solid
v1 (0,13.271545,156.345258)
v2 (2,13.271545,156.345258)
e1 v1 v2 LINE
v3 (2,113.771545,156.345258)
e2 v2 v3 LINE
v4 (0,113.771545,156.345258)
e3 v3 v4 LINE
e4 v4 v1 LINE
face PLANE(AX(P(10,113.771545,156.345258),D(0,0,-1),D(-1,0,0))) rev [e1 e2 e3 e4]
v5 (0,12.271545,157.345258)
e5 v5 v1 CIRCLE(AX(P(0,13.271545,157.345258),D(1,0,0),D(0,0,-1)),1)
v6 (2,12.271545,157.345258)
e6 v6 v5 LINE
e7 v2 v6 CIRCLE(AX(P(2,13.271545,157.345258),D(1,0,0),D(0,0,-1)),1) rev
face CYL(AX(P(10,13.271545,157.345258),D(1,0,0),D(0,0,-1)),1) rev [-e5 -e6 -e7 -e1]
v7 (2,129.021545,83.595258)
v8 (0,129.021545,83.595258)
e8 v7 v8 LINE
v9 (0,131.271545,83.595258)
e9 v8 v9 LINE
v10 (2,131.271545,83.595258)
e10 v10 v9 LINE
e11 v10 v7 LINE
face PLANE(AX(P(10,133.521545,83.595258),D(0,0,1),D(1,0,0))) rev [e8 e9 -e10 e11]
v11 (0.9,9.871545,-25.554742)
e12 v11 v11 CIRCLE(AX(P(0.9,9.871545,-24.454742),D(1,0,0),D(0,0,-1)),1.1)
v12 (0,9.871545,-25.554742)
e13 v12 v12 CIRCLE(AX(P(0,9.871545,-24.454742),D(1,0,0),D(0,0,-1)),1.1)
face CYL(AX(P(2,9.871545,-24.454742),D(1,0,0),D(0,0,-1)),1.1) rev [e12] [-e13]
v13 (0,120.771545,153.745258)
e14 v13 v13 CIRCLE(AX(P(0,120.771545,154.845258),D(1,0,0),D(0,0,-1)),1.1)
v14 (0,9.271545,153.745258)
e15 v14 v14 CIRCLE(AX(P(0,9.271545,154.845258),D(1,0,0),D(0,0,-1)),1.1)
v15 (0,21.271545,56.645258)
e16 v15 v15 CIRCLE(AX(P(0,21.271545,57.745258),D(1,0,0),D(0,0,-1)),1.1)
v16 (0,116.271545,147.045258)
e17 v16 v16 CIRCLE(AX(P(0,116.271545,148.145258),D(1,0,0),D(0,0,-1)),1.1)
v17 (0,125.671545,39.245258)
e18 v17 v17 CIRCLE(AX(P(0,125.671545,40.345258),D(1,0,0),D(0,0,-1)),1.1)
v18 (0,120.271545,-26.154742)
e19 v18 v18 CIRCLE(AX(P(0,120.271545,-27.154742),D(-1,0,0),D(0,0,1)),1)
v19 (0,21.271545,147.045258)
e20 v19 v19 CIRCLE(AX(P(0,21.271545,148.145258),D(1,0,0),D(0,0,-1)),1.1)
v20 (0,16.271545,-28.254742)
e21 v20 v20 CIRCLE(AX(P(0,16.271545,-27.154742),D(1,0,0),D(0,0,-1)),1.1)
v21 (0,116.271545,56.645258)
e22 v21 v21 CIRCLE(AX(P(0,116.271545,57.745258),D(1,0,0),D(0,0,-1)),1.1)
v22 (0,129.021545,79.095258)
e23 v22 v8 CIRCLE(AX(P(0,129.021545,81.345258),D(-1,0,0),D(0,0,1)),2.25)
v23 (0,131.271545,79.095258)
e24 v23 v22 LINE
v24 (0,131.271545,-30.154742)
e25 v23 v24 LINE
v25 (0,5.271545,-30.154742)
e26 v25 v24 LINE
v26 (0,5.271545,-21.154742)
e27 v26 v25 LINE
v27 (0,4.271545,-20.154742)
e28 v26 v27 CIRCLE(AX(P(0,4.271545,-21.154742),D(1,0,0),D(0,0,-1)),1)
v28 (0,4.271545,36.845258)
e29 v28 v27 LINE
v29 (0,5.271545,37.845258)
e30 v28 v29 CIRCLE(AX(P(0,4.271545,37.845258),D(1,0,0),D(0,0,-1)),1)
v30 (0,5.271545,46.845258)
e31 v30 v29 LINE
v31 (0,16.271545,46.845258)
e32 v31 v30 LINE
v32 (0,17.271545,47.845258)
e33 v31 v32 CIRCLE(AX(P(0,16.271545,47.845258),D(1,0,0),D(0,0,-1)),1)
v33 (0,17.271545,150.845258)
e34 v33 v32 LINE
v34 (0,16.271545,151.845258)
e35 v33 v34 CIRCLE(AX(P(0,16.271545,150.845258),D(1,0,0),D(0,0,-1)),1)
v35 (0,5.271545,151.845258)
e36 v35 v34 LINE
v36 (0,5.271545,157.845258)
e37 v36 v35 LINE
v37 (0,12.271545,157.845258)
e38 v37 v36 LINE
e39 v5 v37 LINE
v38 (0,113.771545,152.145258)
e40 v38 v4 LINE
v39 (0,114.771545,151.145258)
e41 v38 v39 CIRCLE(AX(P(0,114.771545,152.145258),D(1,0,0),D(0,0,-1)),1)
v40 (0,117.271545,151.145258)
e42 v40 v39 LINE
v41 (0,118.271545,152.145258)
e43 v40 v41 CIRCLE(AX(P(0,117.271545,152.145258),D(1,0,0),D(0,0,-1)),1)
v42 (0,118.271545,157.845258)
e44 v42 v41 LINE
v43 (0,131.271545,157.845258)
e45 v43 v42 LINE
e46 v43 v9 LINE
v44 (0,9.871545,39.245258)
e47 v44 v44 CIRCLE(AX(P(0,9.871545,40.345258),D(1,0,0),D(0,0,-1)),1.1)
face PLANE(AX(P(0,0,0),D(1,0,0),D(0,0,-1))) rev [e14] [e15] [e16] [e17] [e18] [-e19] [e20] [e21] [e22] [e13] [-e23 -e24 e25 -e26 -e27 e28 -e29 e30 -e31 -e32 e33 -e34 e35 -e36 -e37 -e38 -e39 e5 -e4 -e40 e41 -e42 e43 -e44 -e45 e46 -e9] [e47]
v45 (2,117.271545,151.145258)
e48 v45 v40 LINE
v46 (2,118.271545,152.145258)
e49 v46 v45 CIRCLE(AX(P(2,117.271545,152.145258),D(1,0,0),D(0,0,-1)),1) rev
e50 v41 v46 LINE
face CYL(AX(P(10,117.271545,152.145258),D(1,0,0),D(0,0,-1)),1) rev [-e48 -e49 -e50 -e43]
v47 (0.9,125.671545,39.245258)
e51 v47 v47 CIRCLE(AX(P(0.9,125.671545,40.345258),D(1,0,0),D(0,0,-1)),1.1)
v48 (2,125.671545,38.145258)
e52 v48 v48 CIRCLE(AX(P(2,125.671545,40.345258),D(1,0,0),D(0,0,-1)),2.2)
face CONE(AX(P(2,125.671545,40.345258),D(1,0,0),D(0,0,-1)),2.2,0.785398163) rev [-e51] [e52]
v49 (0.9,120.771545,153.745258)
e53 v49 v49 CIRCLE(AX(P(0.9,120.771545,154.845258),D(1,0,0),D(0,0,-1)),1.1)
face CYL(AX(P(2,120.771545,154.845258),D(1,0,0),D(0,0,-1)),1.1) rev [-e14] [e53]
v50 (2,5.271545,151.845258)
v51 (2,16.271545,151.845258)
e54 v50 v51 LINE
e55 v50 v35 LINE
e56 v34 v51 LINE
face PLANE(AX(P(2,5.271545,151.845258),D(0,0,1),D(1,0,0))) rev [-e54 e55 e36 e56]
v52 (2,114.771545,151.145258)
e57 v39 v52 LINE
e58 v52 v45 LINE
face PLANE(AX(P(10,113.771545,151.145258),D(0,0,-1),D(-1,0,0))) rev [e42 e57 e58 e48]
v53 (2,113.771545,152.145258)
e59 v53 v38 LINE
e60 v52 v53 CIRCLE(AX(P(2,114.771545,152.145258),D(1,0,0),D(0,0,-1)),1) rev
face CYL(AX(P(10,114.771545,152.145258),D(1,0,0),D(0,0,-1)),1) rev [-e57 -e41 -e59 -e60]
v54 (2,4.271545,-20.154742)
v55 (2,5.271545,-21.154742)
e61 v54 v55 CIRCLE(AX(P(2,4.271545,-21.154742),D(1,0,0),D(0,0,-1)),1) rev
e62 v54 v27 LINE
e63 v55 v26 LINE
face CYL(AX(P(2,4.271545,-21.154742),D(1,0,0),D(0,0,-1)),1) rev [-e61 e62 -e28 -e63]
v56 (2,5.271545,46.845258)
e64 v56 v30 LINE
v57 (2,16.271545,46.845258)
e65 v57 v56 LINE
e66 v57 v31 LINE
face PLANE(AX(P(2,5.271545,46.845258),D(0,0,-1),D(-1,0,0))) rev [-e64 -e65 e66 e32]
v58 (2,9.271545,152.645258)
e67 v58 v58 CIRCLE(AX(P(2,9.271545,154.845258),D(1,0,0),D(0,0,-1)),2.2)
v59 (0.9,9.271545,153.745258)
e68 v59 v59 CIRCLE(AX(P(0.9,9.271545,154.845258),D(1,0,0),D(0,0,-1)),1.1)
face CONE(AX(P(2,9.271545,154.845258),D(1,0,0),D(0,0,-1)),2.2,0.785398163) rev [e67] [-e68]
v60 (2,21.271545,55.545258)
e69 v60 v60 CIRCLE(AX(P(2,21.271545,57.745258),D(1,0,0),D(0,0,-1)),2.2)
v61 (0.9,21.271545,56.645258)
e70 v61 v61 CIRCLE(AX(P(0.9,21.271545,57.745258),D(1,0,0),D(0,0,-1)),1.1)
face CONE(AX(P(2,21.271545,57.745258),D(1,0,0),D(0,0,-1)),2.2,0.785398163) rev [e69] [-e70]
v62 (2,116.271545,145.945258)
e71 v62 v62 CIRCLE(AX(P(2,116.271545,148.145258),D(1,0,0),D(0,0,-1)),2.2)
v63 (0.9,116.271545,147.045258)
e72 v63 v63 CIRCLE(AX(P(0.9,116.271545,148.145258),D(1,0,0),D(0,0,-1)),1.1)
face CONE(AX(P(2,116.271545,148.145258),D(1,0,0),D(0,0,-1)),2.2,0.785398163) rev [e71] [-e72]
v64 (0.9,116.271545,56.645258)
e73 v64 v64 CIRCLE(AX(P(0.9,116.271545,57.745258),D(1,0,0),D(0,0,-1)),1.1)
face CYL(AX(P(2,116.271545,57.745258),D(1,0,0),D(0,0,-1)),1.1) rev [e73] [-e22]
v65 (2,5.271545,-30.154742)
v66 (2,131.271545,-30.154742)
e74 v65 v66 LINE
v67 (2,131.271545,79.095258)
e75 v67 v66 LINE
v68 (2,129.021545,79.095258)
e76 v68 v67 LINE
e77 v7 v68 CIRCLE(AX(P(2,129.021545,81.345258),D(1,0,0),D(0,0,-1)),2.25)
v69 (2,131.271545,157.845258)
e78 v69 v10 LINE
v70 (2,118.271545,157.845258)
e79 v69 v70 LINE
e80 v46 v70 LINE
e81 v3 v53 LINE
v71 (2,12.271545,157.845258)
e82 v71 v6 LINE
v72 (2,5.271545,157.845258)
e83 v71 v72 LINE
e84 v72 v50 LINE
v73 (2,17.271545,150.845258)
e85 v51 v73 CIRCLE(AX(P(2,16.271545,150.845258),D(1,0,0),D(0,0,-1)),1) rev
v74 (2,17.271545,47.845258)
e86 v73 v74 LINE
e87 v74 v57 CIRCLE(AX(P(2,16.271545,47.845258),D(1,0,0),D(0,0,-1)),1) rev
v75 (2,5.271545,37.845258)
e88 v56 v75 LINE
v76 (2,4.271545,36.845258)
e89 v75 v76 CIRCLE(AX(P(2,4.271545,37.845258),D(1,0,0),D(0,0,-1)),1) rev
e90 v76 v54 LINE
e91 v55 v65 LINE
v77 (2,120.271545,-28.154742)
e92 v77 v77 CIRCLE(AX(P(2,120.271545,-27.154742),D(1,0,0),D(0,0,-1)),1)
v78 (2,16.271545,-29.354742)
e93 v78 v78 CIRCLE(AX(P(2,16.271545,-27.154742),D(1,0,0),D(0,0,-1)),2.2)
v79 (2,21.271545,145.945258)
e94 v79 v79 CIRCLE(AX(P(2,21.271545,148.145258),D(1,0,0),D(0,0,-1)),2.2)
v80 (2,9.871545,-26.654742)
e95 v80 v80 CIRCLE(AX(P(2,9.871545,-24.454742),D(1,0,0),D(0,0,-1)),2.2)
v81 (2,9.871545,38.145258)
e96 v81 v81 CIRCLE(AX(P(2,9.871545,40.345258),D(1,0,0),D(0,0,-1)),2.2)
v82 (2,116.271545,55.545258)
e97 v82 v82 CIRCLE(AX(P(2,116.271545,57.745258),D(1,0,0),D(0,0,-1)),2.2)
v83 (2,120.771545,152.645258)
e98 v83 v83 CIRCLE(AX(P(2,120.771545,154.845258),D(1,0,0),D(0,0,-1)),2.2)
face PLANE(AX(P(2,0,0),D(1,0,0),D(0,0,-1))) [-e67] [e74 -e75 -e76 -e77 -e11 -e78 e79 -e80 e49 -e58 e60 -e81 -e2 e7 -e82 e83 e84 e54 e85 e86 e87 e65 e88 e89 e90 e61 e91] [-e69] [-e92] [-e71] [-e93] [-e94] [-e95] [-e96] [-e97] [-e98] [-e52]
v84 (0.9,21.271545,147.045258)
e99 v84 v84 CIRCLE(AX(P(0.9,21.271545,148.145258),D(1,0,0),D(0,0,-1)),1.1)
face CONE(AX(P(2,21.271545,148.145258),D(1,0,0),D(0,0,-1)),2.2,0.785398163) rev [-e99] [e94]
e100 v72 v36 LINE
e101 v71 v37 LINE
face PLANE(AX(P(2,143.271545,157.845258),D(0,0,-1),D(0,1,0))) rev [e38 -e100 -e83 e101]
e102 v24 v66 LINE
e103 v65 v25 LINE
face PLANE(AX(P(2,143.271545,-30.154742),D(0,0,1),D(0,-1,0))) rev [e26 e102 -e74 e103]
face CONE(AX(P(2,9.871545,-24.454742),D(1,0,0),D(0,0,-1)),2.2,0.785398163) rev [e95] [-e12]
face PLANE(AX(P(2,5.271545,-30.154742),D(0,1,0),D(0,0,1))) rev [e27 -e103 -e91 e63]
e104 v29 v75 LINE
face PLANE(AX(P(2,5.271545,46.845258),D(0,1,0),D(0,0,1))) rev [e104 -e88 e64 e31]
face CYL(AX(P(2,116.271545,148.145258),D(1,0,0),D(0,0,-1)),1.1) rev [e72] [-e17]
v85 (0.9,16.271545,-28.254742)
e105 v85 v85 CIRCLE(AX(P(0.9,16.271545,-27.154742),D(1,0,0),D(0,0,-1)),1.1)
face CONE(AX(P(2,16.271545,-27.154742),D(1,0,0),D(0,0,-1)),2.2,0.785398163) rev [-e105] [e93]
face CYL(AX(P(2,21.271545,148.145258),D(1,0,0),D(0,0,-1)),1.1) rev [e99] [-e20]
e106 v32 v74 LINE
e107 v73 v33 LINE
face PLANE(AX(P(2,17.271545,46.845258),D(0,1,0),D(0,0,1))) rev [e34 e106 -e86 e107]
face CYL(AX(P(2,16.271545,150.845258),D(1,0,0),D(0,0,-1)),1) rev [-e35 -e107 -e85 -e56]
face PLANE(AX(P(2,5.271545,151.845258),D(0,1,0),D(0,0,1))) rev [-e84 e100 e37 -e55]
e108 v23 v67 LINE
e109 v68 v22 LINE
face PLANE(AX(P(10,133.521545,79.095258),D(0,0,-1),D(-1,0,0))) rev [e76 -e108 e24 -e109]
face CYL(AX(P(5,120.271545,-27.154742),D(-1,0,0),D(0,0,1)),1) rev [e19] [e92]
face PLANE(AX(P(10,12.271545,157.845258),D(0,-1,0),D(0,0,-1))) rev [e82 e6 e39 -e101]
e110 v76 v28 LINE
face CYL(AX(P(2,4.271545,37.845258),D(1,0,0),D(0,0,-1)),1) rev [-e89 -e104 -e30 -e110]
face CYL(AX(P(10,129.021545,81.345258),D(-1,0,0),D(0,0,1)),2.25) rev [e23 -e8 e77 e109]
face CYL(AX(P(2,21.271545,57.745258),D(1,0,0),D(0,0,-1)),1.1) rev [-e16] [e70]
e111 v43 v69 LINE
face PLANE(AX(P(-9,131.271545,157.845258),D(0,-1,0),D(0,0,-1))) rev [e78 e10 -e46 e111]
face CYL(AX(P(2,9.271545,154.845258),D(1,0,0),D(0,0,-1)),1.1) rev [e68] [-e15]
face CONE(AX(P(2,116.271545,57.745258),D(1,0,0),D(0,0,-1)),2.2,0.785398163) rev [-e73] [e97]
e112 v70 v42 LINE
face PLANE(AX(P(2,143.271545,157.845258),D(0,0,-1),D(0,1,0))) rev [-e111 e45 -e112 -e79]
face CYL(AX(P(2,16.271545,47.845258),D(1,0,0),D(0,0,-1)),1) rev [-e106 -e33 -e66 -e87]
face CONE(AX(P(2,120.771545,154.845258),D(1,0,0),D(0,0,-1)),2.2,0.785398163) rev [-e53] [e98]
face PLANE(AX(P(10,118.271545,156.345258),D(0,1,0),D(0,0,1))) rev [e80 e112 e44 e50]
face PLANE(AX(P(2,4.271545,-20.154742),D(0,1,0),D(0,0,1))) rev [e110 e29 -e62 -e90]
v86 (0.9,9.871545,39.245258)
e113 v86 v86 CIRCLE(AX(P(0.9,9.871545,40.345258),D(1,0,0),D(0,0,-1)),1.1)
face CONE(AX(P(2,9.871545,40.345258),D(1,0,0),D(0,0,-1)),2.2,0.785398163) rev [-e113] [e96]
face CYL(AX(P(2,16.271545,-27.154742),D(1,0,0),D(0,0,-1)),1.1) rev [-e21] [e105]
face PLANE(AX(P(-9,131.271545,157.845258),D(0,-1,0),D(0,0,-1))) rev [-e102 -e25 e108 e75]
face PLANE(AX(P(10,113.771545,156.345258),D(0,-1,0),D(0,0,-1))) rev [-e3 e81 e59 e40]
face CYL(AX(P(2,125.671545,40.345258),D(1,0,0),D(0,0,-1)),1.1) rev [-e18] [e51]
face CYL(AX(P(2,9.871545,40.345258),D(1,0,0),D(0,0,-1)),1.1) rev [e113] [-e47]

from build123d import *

# Parameters (mm, degrees)
SKETCH_1_W                = 188
SKETCH_1_H                = 150
EXTRUDE_1_DEPTH           = 2
SKETCH_13_W               = 188
SKETCH_13_H               = 12
CUT_EXTRUDE_8_DEPTH       = 11
SKETCH_5_R                = 1
EPP_DEPTH                 = 2
SKETCH_6_R                = 1
CUT_EXTRUDE_4_DEPTH       = 2
B_FAN_DEPTH               = 2
PCI_E_DEPTH               = 2
SKETCH_14_R               = 1
CUT_EXTRUDE_7447_DEPTH    = 5
IO_2_DEPTH                = 10
HOLE_WIZARD_1_AT_2_COUNT  = 2
HOLE_WIZARD_1_AT_2_PITCH  = 115.8
HOLE_WIZARD_1_AT_3_COUNT  = 2
HOLE_WIZARD_1_AT_3_PITCH  = 132.697701563
HOLE_WIZARD_1_AT_4_COUNT  = 2
HOLE_WIZARD_1_AT_4_PITCH  = 105.840068027
HOLE_WIZARD_1_AT_5_COUNT  = 2
HOLE_WIZARD_1_AT_5_PITCH  = 150.067318228
HOLE_WIZARD_1_AT_6_COUNT  = 2
HOLE_WIZARD_1_AT_6_PITCH  = 108.209056922
HOLE_WIZARD_1_AT_7_COUNT  = 2
HOLE_WIZARD_1_AT_7_PITCH  = 19.776754031
HOLE_WIZARD_1_AT_8_COUNT  = 2
HOLE_WIZARD_1_AT_8_PITCH  = 114.604799201
HOLE_WIZARD_1_AT_9_COUNT  = 2
HOLE_WIZARD_1_AT_9_PITCH  = 163.276483304
HOLE_WIZARD_1_AT_10_COUNT = 2
HOLE_WIZARD_1_AT_10_PITCH = 128.548084389
CUT_EXTRUDE_14_DEPTH      = 10
FILLET_2_R                = 1


with BuildPart() as part:
    # 草图1 → 凸台-拉伸1 (new body)
    with BuildSketch(Plane(origin=(0, 0, 0), x_dir=(0, 0, -1), z_dir=(1, 0, 0))):
        with Locations((-63.845257573, 68.271545487)):
            Rectangle(SKETCH_1_W, SKETCH_1_H)
    extrude(amount=EXTRUDE_1_DEPTH)

    # 草图13 → 切除-拉伸8 (cut)
    with BuildSketch(Plane(origin=(2, 0, 0), x_dir=(0, 0, -1), z_dir=(1, 0, 0))):
        with Locations((-63.845257573, 137.271545487)):
            Rectangle(SKETCH_13_W, SKETCH_13_H)
    extrude(amount=-CUT_EXTRUDE_8_DEPTH, mode=Mode.SUBTRACT)

    # 草图5 → EPP (cut)
    with BuildSketch(Plane.ZY):
        with Locations((40.345257573, 125.671545487)):
            Circle(SKETCH_5_R)
        with Locations((-24.454742427, 9.871545487)):
            Circle(SKETCH_5_R)
        with Locations((40.345257573, 9.871545487)):
            Circle(SKETCH_5_R)
    extrude(amount=-EPP_DEPTH, mode=Mode.SUBTRACT)

    # 草图6 → 切除-拉伸4 (cut)
    with BuildSketch(Plane.ZY):
        with Locations((57.745257573, 116.271545487)):
            Circle(SKETCH_6_R)
        with Locations((148.145257573, 116.271545487)):
            Circle(SKETCH_6_R)
        with Locations((57.745257573, 21.271545487)):
            Circle(SKETCH_6_R)
        with Locations((148.145257573, 21.271545487)):
            Circle(SKETCH_6_R)
    extrude(amount=-CUT_EXTRUDE_4_DEPTH, mode=Mode.SUBTRACT)

    # 草图3 → B-FAN (cut)
    with BuildSketch(Plane.ZY):
        Polygon((-30.154742427, -6.728454513), (46.845257573, -6.728454513), (46.845257573, 4.271545487), (46.845257573, 5.271545487), (36.845257573, 5.271545487), (36.845257573, 4.271545487), (-20.154742427, 4.271545487), (-20.154742427, 5.271545487), (-30.154742427, 5.271545487), (-30.154742427, 4.271545487), align=None)
    extrude(amount=-B_FAN_DEPTH, mode=Mode.SUBTRACT)

    # 草图10 → PCI-E (cut)
    with BuildSketch(Plane.ZY):
        Polygon((46.845257573, 5.271545487), (46.845257573, -6.728454513), (157.845257573, -6.728454513), (157.845257573, 5.271545487), (151.845257573, 5.271545487), (151.845257573, 17.271545487), (46.845257573, 17.271545487), align=None)
    extrude(amount=-PCI_E_DEPTH, mode=Mode.SUBTRACT)

    # 草图14 → Cut-Extrude 7447 (cut)
    with BuildSketch(Plane.ZY):
        with Locations((154.845257573, 120.771545487)):
            Circle(SKETCH_14_R)
        with Locations((154.845257573, 9.271545487)):
            Circle(SKETCH_14_R)
        with Locations((-27.154742427, 16.271545487)):
            Circle(SKETCH_14_R)
        with Locations((-27.154742427, 120.271545487)):
            Circle(SKETCH_14_R)
    extrude(amount=-CUT_EXTRUDE_7447_DEPTH, mode=Mode.SUBTRACT)

    # 草图15 → IO 2 (cut)
    with BuildSketch(Plane.ZY):
        Polygon((157.845257573, 118.271545487), (156.345257573, 118.271545487), (151.145257573, 118.271545487), (151.145257573, 113.771545487), (156.345257573, 113.771545487), (156.345257573, 12.271545487), (157.845257573, 12.271545487), align=None)
    extrude(amount=-IO_2_DEPTH, mode=Mode.SUBTRACT)

    # 草图17 → 打孔尺寸(%根据)内六角花形沉头螺钉的类型1 (revolve, cut)
    with BuildSketch(Plane(origin=(2, 125.671545487, 40.345257573), x_dir=(0, 0, -1), z_dir=(0, 1, 0))):
        Polygon((0, 0), (0, 2), (1.1, 2), (1.1, 1.1), (2.2, 0), align=None)
    hole_wizard_1 = revolve(axis=Axis((8.35, 125.671545487, 40.345257573), (-1, 0, 0)), mode=Mode.SUBTRACT)

    # 打孔尺寸(%根据)内六角花形沉头螺钉的类型1 at 2: 打孔尺寸(%根据)内六角花形沉头螺钉的类型1 ×2
    with Locations(*[(0, -i * HOLE_WIZARD_1_AT_2_PITCH, 0) for i in range(1, HOLE_WIZARD_1_AT_2_COUNT)]):
        add(hole_wizard_1, mode=Mode.SUBTRACT)

    # 打孔尺寸(%根据)内六角花形沉头螺钉的类型1 at 3: 打孔尺寸(%根据)内六角花形沉头螺钉的类型1 ×2
    with Locations(*[Vector(0, -0.8726601790111727, -0.4883279758197234) * (i * HOLE_WIZARD_1_AT_3_PITCH) for i in range(1, HOLE_WIZARD_1_AT_3_COUNT)]):
        add(hole_wizard_1, mode=Mode.SUBTRACT)

    # 打孔尺寸(%根据)内六角花形沉头螺钉的类型1 at 4: 打孔尺寸(%根据)内六角花形沉头螺钉的类型1 ×2
    with Locations(*[Vector(0, -0.9863939238321437, 0.16439898730535765) * (i * HOLE_WIZARD_1_AT_4_PITCH) for i in range(1, HOLE_WIZARD_1_AT_4_COUNT)]):
        add(hole_wizard_1, mode=Mode.SUBTRACT)

    # 打孔尺寸(%根据)内六角花形沉头螺钉的类型1 at 5: 打孔尺寸(%根据)内六角花形沉头螺钉的类型1 ×2
    with Locations(*[Vector(0, -0.6956877835433596, 0.7183442822411324) * (i * HOLE_WIZARD_1_AT_5_PITCH) for i in range(1, HOLE_WIZARD_1_AT_5_COUNT)]):
        add(hole_wizard_1, mode=Mode.SUBTRACT)

    # 打孔尺寸(%根据)内六角花形沉头螺钉的类型1 at 6: 打孔尺寸(%根据)内六角花形沉头螺钉的类型1 ×2
    with Locations(*[Vector(0, -0.0868688838749896, 0.9962197533748834) * (i * HOLE_WIZARD_1_AT_6_PITCH) for i in range(1, HOLE_WIZARD_1_AT_6_COUNT)]):
        add(hole_wizard_1, mode=Mode.SUBTRACT)

    # 打孔尺寸(%根据)内六角花形沉头螺钉的类型1 at 7: 打孔尺寸(%根据)内六角花形沉头螺钉的类型1 ×2
    with Locations(*[Vector(0, -0.47530550186838766, 0.8798208226074444) * (i * HOLE_WIZARD_1_AT_7_PITCH) for i in range(1, HOLE_WIZARD_1_AT_7_COUNT)]):
        add(hole_wizard_1, mode=Mode.SUBTRACT)

    # 打孔尺寸(%根据)内六角花形沉头螺钉的类型1 at 8: 打孔尺寸(%根据)内六角花形沉头螺钉的类型1 ×2
    with Locations(*[Vector(0, -0.04275562658931698, 0.9990855600973096) * (i * HOLE_WIZARD_1_AT_8_PITCH) for i in range(1, HOLE_WIZARD_1_AT_8_COUNT)]):
        add(hole_wizard_1, mode=Mode.SUBTRACT)

    # 打孔尺寸(%根据)内六角花形沉头螺钉的类型1 at 9: 打孔尺寸(%根据)内六角花形沉头螺钉的类型1 ×2
    with Locations(*[Vector(0, -0.7129011946168821, 0.7012644912683248) * (i * HOLE_WIZARD_1_AT_9_PITCH) for i in range(1, HOLE_WIZARD_1_AT_9_COUNT)]):
        add(hole_wizard_1, mode=Mode.SUBTRACT)

    # 打孔尺寸(%根据)内六角花形沉头螺钉的类型1 at 10: 打孔尺寸(%根据)内六角花形沉头螺钉的类型1 ×2
    with Locations(*[Vector(0, -0.8510434093223341, -0.5250953393899228) * (i * HOLE_WIZARD_1_AT_10_PITCH) for i in range(1, HOLE_WIZARD_1_AT_10_COUNT)]):
        add(hole_wizard_1, mode=Mode.SUBTRACT)

    # 草图23 → 切除-拉伸14 (cut)
    with BuildSketch(Plane.ZY):
        with BuildLine():
            Line((83.595257573, 133.521545487), (83.595257573, 129.021545487))
            ThreePointArc((83.595257573, 129.021545487), (81.345257573, 126.771545487), (79.095257573, 129.021545487))
            Line((79.095257573, 129.021545487), (79.095257573, 133.521545487))
            ThreePointArc((79.095257573, 133.521545487), (81.345257573, 135.771545487), (83.595257573, 133.521545487))
        make_face()
    extrude(amount=-CUT_EXTRUDE_14_DEPTH, mode=Mode.SUBTRACT)

    # 圆角2
    fillet_2_edges = [part.edges().sort_by_distance(p)[0] for p in [
        (1, 113.771545487, 151.145257573),
        (1, 118.271545487, 151.145257573),
        (1, 12.271545487, 156.345257573),
        (1, 17.271545487, 151.845257573),
        (1, 17.271545487, 46.845257573),
        (1, 5.271545487, 36.845257573),
        (1, 5.271545487, -20.154742427),
    ]]
    fillet(fillet_2_edges, radius=FILLET_2_R - 0.0001)  # a hair under: the kernel refuses the full size


solid = part.part
